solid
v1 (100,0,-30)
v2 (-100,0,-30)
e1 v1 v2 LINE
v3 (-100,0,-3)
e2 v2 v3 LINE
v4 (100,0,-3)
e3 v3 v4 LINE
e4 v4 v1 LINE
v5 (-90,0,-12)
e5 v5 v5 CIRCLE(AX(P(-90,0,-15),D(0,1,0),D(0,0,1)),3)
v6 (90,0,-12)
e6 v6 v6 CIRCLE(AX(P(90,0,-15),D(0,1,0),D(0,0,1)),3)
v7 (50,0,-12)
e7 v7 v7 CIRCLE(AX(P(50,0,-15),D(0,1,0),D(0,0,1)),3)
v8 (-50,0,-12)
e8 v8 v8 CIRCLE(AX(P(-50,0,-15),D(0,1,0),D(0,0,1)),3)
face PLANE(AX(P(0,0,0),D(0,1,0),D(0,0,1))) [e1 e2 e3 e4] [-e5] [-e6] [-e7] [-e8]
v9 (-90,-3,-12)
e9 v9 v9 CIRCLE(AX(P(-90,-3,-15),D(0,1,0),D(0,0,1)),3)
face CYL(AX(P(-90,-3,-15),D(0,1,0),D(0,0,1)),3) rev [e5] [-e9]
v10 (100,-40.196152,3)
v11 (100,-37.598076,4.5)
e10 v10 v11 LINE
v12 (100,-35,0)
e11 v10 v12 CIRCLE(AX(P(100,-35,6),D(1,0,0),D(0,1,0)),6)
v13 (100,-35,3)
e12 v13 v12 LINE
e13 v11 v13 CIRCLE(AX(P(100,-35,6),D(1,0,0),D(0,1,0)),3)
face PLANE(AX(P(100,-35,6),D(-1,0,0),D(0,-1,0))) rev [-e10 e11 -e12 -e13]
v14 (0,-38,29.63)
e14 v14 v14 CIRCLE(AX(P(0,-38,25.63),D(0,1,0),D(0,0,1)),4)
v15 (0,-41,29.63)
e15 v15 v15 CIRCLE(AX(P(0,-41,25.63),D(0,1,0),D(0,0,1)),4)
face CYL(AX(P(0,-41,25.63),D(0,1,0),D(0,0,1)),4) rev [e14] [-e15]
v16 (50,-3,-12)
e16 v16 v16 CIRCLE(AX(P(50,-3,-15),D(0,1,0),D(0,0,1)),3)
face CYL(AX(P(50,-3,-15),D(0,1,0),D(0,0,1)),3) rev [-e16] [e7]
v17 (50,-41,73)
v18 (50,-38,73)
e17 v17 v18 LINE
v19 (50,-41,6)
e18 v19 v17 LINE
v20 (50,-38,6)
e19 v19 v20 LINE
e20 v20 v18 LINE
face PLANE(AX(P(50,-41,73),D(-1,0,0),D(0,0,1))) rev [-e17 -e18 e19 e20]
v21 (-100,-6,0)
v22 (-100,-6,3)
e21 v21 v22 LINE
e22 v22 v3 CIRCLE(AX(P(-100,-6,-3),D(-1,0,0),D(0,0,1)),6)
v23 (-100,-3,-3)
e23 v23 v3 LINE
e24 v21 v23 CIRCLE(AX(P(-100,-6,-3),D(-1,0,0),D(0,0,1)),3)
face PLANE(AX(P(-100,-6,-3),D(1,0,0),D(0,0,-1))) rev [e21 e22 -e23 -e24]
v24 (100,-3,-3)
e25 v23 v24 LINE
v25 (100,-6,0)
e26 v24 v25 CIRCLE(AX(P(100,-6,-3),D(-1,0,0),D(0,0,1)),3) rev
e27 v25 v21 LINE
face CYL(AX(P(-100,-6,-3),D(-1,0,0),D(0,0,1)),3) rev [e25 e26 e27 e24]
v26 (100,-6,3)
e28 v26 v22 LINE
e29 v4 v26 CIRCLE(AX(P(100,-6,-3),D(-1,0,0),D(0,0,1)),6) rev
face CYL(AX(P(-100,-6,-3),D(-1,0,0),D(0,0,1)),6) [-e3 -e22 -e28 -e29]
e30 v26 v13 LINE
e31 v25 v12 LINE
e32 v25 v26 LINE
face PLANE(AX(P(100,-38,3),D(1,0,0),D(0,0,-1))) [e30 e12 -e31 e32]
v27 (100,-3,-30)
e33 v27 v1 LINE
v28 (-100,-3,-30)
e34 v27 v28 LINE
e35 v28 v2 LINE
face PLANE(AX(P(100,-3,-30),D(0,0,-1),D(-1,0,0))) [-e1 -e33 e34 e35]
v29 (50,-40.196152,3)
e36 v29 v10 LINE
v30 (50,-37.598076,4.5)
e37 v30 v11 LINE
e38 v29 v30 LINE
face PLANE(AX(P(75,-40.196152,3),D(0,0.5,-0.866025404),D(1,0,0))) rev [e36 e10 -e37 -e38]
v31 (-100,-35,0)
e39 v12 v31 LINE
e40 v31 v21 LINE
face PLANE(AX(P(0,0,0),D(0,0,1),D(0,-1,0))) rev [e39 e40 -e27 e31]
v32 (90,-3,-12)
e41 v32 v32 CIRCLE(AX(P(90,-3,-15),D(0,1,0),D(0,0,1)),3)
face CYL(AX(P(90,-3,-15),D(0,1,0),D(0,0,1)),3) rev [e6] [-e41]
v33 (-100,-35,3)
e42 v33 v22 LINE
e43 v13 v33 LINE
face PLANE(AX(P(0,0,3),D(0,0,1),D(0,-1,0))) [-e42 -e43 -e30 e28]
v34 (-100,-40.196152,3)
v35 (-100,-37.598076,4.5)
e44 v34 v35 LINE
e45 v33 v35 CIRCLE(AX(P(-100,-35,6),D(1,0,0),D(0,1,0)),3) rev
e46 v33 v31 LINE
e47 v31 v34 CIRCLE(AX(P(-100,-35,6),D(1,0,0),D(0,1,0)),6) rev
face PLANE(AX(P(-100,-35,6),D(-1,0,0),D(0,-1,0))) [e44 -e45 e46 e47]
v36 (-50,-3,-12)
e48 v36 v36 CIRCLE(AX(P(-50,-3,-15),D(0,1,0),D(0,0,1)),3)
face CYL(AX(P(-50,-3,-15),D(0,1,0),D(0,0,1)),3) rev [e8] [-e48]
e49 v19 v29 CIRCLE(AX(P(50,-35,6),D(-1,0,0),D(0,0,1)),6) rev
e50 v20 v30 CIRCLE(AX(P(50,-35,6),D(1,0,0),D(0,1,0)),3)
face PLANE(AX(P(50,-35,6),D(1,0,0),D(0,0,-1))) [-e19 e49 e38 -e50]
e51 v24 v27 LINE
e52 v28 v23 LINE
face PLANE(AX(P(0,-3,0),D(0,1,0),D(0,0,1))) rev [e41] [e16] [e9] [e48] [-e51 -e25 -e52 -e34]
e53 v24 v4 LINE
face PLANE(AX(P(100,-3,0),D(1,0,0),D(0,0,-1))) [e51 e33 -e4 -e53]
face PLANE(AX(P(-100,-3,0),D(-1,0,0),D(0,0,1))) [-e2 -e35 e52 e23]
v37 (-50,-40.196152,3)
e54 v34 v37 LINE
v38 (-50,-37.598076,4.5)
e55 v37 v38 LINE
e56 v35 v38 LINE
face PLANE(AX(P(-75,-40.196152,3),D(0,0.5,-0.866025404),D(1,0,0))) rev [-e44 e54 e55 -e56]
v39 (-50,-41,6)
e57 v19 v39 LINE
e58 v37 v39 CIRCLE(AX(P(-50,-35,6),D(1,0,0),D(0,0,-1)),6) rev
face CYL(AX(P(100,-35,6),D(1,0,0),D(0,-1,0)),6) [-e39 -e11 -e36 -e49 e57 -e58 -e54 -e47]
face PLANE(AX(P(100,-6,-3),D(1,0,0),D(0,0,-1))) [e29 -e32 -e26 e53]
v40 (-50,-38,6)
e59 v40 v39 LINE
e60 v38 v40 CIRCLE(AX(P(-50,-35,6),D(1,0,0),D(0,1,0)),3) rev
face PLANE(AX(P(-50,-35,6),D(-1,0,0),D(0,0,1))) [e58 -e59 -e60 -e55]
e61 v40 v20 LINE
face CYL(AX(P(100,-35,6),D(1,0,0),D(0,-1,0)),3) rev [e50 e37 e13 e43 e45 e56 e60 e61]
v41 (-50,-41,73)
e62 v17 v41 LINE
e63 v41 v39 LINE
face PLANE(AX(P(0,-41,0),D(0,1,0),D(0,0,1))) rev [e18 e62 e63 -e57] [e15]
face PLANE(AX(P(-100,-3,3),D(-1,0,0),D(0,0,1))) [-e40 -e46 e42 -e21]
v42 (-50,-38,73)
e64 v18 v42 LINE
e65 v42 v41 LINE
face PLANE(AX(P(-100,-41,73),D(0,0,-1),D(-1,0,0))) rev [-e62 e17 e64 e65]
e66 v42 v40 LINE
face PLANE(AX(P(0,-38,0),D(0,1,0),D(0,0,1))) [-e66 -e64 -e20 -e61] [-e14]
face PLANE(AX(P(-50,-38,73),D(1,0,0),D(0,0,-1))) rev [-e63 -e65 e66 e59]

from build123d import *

# Parameters (mm, degrees)
SKETCH9_W                    = 200
SKETCH9_H                    = 30
BASE_FLANGE2_DEPTH           = 3
EDGE_FLANGE1_STRIP_W         = 18
EDGE_FLANGE1_STRIP_H         = 3
EDGE_FLANGE1_STRIP_CUT_DEPTH = 200
EDGE_FLANGE1_DEPTH           = 200
EDGE_FLANGE2_STRIP_W         = 18
EDGE_FLANGE2_STRIP_H         = 3
EDGE_FLANGE2_STRIP_CUT_DEPTH = 200
EDGE_FLANGE2_DEPTH           = 200
CUT_EXTRUDE1_START           = -3
CUT_EXTRUDE1_OUTLINE_R       = 4
CUT_EXTRUDE1_DEPTH           = 3
CUT_EXTRUDE1_START_2         = -100
CUT_EXTRUDE1_2_DEPTH         = 50
CUT_EXTRUDE1_START_3         = 50
CUT_EXTRUDE1_3_DEPTH         = 50
SKETCH19_R                   = 3
CUT_EXTRUDE2_DEPTH           = 3


# Read off the part's stored shape, not the designer's step: Cut-Extrude1
# Sheet-metal steps are written as plain solids
with BuildPart() as part:
    # Sketch9 → Base-Flange2 (new body)
    with BuildSketch(Plane(origin=(0, 0, 0), x_dir=(1, 0, 0), z_dir=(0, 1, 0))):
        with Locations((0, 15)):
            Rectangle(SKETCH9_W, SKETCH9_H)
    extrude(amount=-BASE_FLANGE2_DEPTH)

    # Edge-Flange1 strip (across the edge) → Edge-Flange1 strip cut (cut)
    with BuildSketch(Plane(origin=(100, -3, 0), x_dir=(0, 0, -1), z_dir=(-1, 0, 0))):
        with Locations((-6, -1.5)):
            Rectangle(EDGE_FLANGE1_STRIP_W, EDGE_FLANGE1_STRIP_H)
    extrude(amount=EDGE_FLANGE1_STRIP_CUT_DEPTH, mode=Mode.SUBTRACT)

    # Edge-Flange1 section (across the edge) → Edge-Flange1 (add)
    with BuildSketch(Plane(origin=(100, -3, 0), x_dir=(0, 0, -1), z_dir=(-1, 0, 0))):
        with BuildLine():
            Line((-3, 3), (-3, 35))
            Line((-3, 35), (0, 35))
            Line((0, 35), (0, 3))
            ThreePointArc((0, 3), (0.878679656, 0.878679656), (3, 0))
            Line((3, 0), (3, -3))
            ThreePointArc((3, -3), (-1.242640687, -1.242640687), (-3, 3))
        make_face()
    extrude(amount=EDGE_FLANGE1_DEPTH)

    # Edge-Flange2 strip (across the edge) → Edge-Flange2 strip cut (cut)
    with BuildSketch(Plane(origin=(-100, -38, 3), x_dir=(0, 1, 0), z_dir=(1, 0, 0))):
        with Locations((-6, -1.5)):
            Rectangle(EDGE_FLANGE2_STRIP_W, EDGE_FLANGE2_STRIP_H)
    extrude(amount=EDGE_FLANGE2_STRIP_CUT_DEPTH, mode=Mode.SUBTRACT)

    # Edge-Flange2 section (across the edge) → Edge-Flange2 (add)
    with BuildSketch(Plane(origin=(-100, -38, 3), x_dir=(0, 1, 0), z_dir=(1, 0, 0))):
        with BuildLine():
            Line((-3, 3), (-3, 70))
            Line((-3, 70), (0, 70))
            Line((0, 70), (0, 3))
            ThreePointArc((0, 3), (0.878679656, 0.878679656), (3, 0))
            Line((3, 0), (3, -3))
            ThreePointArc((3, -3), (-1.242640687, -1.242640687), (-3, 3))
        make_face()
    extrude(amount=EDGE_FLANGE2_DEPTH)

    # Cut-Extrude1 outline → Cut-Extrude1 (cut)
    with BuildSketch(Plane(origin=(0, -38, 0), x_dir=(1, 0, 0), z_dir=(0, 1, 0)).offset(CUT_EXTRUDE1_START)):
        with Locations((0, -25.63)):
            Circle(CUT_EXTRUDE1_OUTLINE_R)
    extrude(amount=CUT_EXTRUDE1_DEPTH, mode=Mode.SUBTRACT)

    # Cut-Extrude1 2 outline → Cut-Extrude1 2 (cut)
    with BuildSketch(Plane.YZ.offset(CUT_EXTRUDE1_START_2)):
        with BuildLine():
            ThreePointArc((-41, 6), (-40.795554958, 4.447085729), (-40.196152423, 3))
            Line((-40.196152423, 3), (-37.598076212, 4.5))
            ThreePointArc((-37.598076212, 4.5), (-37.897777479, 5.223542864), (-38, 6))
            Line((-38, 6), (-38, 73))
            Line((-38, 73), (-41, 73))
            Line((-41, 73), (-41, 6))
        make_face()
    extrude(amount=CUT_EXTRUDE1_2_DEPTH, mode=Mode.SUBTRACT)

    # Cut-Extrude1 3 outline → Cut-Extrude1 3 (cut)
    with BuildSketch(Plane.YZ.offset(CUT_EXTRUDE1_START_3)):
        with BuildLine():
            ThreePointArc((-41, 6), (-40.795554958, 4.447085729), (-40.196152423, 3))
            Line((-40.196152423, 3), (-37.598076212, 4.5))
            ThreePointArc((-37.598076212, 4.5), (-37.897777479, 5.223542864), (-38, 6))
            Line((-38, 6), (-38, 73))
            Line((-38, 73), (-41, 73))
            Line((-41, 73), (-41, 6))
        make_face()
    extrude(amount=CUT_EXTRUDE1_3_DEPTH, mode=Mode.SUBTRACT)

    # Sketch19 → Cut-Extrude2 (cut)
    with BuildSketch(Plane(origin=(0, 0, 0), x_dir=(1, 0, 0), z_dir=(0, 1, 0))):
        with Locations(Location((-90, 15, 0), (0, 0, 270))):
            Circle(SKETCH19_R)
        with Locations(Location((-50, 15, 0), (0, 0, 270))):
            Circle(SKETCH19_R)
        with Locations(Location((50, 15, 0), (0, 0, 270))):
            Circle(SKETCH19_R)
        with Locations(Location((90, 15, 0), (0, 0, 270))):
            Circle(SKETCH19_R)
    extrude(amount=-CUT_EXTRUDE2_DEPTH, mode=Mode.SUBTRACT)


solid = part.part
